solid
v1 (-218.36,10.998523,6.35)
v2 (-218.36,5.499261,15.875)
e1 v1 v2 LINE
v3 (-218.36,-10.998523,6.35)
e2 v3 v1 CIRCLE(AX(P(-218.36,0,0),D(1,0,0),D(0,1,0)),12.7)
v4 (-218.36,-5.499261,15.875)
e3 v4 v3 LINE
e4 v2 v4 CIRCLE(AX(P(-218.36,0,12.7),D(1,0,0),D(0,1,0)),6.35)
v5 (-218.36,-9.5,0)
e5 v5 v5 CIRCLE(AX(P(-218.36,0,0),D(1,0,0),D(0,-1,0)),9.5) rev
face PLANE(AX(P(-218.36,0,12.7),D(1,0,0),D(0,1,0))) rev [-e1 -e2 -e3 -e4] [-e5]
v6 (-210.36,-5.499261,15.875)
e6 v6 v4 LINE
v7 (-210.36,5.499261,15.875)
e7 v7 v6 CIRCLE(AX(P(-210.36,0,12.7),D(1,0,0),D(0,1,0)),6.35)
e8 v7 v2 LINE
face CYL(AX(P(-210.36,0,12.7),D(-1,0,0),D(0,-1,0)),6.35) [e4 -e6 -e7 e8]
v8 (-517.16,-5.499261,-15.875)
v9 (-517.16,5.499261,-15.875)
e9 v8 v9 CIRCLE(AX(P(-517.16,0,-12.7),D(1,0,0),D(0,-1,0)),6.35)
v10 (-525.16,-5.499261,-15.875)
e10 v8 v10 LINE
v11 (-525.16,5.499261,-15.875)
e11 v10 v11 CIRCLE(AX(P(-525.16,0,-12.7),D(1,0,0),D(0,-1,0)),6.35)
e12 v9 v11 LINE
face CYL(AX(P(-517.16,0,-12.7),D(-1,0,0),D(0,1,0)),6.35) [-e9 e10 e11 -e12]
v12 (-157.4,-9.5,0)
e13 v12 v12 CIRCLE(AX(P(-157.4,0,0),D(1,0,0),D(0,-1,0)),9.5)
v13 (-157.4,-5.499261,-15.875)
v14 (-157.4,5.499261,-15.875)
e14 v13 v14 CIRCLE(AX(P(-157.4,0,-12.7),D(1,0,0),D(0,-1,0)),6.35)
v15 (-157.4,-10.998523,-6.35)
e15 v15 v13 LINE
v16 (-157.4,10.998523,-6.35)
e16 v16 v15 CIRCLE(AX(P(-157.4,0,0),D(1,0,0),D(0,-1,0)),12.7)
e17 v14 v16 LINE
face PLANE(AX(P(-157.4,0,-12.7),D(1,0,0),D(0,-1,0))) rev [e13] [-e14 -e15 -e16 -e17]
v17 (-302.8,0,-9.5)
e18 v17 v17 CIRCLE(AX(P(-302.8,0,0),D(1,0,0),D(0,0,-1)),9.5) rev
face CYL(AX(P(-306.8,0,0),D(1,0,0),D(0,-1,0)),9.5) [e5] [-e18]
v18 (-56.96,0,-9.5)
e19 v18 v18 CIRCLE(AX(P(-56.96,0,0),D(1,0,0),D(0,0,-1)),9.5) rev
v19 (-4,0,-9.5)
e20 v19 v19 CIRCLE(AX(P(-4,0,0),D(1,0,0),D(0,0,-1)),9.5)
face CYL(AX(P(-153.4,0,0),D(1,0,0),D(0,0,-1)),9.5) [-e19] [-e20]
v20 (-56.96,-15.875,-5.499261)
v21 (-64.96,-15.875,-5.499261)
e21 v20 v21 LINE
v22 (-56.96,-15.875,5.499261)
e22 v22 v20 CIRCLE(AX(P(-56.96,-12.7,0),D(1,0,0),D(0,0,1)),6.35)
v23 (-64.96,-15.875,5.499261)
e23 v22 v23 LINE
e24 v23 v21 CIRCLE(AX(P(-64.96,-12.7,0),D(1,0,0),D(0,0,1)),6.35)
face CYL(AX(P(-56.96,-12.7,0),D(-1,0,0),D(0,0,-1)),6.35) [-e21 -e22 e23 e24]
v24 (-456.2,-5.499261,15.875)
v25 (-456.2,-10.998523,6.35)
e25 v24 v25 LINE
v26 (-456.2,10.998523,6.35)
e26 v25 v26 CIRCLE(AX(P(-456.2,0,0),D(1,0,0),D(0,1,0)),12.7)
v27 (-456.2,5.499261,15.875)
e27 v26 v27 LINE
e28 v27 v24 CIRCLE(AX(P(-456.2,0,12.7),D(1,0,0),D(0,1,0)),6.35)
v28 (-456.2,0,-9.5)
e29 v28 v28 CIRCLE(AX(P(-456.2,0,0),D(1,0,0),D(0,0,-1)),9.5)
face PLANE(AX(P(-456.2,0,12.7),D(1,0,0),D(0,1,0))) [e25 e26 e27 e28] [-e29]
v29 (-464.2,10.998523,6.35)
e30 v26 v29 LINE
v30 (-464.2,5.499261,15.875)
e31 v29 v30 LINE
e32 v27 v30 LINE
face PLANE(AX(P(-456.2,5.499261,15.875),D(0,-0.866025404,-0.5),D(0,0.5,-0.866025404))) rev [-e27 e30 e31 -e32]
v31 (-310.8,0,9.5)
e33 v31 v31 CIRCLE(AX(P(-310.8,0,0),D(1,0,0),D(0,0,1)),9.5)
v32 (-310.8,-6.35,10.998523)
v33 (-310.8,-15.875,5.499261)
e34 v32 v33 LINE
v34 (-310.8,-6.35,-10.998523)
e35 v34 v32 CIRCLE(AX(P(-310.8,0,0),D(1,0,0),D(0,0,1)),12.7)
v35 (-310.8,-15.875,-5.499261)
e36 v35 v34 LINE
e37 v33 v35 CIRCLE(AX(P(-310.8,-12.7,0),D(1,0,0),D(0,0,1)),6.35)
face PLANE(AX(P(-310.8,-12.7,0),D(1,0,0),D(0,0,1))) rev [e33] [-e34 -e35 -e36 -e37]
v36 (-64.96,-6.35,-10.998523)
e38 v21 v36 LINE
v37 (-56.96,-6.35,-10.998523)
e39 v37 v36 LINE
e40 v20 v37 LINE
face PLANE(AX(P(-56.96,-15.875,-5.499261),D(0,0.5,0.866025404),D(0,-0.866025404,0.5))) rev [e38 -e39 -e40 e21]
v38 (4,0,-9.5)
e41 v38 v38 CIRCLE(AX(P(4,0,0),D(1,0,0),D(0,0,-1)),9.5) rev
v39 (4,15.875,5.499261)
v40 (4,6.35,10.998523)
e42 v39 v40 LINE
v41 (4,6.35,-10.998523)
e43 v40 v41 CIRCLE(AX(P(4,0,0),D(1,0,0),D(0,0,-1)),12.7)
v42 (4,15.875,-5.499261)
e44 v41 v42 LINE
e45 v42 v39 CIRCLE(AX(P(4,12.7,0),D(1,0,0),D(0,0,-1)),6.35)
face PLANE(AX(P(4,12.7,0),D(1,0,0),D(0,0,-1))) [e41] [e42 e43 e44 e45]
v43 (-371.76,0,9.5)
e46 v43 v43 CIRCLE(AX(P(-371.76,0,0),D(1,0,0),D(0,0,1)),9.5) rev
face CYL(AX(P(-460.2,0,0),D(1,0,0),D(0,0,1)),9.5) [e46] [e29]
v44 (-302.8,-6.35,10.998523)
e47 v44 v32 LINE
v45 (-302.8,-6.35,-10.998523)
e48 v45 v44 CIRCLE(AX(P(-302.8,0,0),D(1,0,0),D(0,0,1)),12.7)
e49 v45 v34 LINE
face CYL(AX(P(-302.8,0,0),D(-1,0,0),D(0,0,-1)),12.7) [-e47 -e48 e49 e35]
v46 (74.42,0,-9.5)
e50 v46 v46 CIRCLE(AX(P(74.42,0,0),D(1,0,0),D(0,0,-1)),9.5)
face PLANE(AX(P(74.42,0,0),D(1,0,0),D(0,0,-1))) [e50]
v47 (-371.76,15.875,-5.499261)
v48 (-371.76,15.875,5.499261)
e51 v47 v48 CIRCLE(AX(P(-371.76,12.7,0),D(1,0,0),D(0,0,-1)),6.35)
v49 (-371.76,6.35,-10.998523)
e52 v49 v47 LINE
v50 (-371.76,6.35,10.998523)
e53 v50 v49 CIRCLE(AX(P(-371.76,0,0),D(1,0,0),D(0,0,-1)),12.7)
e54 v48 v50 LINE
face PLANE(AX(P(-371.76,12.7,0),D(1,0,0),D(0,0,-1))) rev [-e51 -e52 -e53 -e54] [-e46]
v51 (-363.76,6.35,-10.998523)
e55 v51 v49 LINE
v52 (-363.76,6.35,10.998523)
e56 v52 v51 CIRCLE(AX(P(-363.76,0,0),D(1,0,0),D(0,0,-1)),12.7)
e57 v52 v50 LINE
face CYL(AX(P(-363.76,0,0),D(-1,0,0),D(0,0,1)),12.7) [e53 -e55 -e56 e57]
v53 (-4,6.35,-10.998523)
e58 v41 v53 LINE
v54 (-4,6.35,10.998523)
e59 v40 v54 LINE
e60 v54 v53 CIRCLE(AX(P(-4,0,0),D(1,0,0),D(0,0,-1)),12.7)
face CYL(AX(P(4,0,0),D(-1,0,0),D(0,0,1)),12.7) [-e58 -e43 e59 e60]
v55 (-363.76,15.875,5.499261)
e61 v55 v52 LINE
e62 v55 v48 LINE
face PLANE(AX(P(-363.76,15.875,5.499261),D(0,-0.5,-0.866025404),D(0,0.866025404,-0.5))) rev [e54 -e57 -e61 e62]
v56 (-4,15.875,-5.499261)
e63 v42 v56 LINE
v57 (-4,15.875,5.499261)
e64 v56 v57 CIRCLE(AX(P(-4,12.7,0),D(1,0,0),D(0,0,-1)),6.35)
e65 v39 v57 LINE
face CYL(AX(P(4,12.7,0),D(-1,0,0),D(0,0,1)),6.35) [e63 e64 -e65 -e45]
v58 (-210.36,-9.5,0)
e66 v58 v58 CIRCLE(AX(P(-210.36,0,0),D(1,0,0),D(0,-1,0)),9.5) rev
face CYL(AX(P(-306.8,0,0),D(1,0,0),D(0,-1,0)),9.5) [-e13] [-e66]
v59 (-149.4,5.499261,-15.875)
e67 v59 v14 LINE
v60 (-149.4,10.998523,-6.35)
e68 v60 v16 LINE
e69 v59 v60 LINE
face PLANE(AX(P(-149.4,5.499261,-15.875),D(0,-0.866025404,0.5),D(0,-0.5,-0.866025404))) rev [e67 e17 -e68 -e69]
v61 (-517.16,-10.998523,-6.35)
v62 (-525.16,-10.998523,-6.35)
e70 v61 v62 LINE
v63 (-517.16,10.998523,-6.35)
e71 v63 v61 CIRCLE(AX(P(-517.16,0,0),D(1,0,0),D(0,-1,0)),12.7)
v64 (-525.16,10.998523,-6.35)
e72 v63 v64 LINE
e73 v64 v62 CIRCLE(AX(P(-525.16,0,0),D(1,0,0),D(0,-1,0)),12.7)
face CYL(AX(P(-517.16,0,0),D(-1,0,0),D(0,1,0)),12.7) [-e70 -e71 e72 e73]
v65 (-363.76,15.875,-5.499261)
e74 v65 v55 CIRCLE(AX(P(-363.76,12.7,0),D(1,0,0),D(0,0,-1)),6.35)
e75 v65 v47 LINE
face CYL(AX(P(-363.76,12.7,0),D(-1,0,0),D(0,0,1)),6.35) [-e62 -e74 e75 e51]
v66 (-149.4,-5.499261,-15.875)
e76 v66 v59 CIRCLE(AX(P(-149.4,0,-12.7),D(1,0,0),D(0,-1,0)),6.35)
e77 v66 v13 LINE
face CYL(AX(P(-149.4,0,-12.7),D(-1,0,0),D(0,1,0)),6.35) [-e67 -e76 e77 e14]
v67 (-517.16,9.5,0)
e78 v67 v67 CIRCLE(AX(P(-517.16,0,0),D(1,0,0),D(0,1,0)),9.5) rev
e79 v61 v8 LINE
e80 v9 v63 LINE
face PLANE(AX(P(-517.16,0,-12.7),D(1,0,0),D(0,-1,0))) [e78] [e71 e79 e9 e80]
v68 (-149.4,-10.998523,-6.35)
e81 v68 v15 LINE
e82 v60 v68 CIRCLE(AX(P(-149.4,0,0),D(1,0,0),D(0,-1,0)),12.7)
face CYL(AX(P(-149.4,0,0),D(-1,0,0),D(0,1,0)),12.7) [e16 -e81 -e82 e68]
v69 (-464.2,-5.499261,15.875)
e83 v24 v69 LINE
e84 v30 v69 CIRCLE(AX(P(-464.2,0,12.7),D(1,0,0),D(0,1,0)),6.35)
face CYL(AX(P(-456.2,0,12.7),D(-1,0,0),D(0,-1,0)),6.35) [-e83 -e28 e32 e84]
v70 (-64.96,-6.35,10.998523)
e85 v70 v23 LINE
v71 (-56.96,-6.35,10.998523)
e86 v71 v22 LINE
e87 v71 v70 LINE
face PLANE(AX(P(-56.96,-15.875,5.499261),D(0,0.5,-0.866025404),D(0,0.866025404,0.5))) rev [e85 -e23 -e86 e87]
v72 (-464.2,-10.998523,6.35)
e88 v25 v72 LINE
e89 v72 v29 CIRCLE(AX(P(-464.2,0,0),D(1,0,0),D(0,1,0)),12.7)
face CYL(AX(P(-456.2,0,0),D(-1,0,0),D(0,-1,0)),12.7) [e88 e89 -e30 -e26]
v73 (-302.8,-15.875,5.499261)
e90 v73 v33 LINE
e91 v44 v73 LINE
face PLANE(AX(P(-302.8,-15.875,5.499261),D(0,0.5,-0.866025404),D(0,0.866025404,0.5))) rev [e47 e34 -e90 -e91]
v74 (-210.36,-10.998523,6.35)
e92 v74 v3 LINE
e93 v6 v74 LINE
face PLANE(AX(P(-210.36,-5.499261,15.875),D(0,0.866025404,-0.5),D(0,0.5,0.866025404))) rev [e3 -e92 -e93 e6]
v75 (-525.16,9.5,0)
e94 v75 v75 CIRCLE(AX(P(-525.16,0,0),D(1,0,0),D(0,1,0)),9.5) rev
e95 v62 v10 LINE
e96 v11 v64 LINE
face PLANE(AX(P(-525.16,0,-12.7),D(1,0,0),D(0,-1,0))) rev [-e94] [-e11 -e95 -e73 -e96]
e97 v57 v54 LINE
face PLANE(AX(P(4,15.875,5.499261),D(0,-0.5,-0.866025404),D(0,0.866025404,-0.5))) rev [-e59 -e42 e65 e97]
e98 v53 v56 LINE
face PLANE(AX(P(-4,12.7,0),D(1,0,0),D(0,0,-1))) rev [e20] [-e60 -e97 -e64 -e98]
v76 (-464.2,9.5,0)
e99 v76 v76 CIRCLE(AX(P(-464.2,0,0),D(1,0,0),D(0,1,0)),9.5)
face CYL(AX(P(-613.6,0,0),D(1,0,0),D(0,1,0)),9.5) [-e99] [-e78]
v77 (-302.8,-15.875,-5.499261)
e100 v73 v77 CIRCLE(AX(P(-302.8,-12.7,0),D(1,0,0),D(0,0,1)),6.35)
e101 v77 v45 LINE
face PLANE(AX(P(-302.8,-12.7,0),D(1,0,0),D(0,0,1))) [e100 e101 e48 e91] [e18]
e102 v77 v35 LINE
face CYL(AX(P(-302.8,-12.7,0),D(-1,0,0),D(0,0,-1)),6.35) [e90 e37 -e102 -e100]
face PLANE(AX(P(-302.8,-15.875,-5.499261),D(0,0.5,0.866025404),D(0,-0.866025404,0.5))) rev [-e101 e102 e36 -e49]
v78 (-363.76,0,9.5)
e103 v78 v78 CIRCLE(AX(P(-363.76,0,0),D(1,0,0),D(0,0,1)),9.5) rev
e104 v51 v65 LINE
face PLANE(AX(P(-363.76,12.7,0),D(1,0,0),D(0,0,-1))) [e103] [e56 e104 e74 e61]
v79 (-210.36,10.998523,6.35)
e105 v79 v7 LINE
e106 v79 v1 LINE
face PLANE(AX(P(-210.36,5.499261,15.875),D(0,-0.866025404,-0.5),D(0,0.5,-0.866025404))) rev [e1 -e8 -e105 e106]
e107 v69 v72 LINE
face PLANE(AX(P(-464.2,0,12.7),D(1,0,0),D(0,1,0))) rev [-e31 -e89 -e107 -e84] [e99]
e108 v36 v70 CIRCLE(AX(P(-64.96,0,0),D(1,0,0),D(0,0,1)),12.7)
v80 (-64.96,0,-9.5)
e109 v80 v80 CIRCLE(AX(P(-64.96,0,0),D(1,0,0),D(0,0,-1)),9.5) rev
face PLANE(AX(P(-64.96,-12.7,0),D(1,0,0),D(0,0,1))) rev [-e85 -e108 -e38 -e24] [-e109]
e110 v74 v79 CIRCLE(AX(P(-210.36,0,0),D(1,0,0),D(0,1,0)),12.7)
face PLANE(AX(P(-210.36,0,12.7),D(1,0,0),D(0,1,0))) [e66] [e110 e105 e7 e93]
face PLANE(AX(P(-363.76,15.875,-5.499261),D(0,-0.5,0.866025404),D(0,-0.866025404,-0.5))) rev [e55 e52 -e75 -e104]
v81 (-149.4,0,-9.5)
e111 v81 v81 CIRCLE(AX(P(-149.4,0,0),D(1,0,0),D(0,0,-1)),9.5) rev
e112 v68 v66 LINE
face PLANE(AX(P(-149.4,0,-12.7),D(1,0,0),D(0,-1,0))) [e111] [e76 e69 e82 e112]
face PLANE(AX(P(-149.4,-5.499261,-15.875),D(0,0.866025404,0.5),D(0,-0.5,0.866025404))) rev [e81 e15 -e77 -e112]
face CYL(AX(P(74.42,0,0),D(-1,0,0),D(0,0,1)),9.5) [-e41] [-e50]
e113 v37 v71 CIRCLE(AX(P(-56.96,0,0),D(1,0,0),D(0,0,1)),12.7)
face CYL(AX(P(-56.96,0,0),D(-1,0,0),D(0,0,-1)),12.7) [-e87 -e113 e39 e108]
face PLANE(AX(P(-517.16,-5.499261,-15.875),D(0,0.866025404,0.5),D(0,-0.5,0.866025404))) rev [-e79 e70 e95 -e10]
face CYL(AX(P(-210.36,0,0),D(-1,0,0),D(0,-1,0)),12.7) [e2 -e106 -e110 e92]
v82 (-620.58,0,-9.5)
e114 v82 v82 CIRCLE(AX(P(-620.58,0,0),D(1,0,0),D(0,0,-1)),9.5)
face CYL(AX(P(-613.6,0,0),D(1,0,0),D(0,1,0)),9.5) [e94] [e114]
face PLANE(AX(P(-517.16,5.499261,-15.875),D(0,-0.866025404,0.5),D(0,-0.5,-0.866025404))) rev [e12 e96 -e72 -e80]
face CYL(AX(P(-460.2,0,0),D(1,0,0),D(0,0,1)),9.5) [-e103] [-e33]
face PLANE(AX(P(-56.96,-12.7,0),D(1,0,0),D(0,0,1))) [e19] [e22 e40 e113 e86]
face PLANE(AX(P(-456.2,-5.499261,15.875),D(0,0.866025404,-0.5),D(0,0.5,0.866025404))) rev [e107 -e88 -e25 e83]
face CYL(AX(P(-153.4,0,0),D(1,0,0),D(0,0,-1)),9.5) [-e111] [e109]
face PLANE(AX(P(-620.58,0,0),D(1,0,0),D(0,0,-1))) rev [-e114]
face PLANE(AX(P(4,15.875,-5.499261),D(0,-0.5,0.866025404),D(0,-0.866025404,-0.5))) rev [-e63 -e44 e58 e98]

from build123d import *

# Parameters (mm, degrees)
BOSS_EXTRUDE1_DEPTH         = 4
BODY_MOVE_COPY2_ANGLE       = 180
SKETCH2_R                   = 9.5
BOSS_EXTRUDE2_DEPTH         = 153.4
BODY_MOVE_COPY3_START       = -613.6
BODY_MOVE_COPY3_OUTLINE_R   = 9.5
BODY_MOVE_COPY3_DEPTH       = 157.4
BODY_MOVE_COPY3_START_2     = -525.16
BODY_MOVE_COPY3_2_OUTLINE_R = 9.5
BODY_MOVE_COPY3_2_DEPTH     = 8
BODY_MOVE_COPY3_START_3     = -464.2
BODY_MOVE_COPY3_3_OUTLINE_R = 9.5
BODY_MOVE_COPY3_3_DEPTH     = 8
BODY_MOVE_COPY3_START_4     = -460.2
BODY_MOVE_COPY3_4_OUTLINE_R = 9.5
BODY_MOVE_COPY3_4_DEPTH     = 157.4
BODY_MOVE_COPY3_START_5     = -371.76
BODY_MOVE_COPY3_5_OUTLINE_R = 9.5
BODY_MOVE_COPY3_5_DEPTH     = 8
BODY_MOVE_COPY3_START_6     = -310.8
BODY_MOVE_COPY3_6_OUTLINE_R = 9.5
BODY_MOVE_COPY3_6_DEPTH     = 8
BODY_MOVE_COPY3_START_7     = -306.8
BODY_MOVE_COPY3_7_OUTLINE_R = 9.5
BODY_MOVE_COPY3_7_DEPTH     = 157.4
BODY_MOVE_COPY3_START_8     = -218.36
BODY_MOVE_COPY3_8_OUTLINE_R = 9.5
BODY_MOVE_COPY3_8_DEPTH     = 8
BODY_MOVE_COPY3_START_9     = -157.4
BODY_MOVE_COPY3_9_OUTLINE_R = 9.5
BODY_MOVE_COPY3_9_DEPTH     = 8
BODY_MOVE_COPY4_ANGLE       = 90
BODY_MOVE_COPY5_ANGLE       = 180
BODY_MOVE_COPY6_ANGLE       = 90
BOSS_EXTRUDE3_START         = 74.42
SKETCH2_2_R                 = 9.5
BOSS_EXTRUDE3_DEPTH         = 74.42
BOSS_EXTRUDE4_START         = -620.58
SKETCH2_3_R                 = 9.5
BOSS_EXTRUDE4_DEPTH         = 6.98


# Read off the part's stored shape, not the designer's step: Body-Move/Copy3
with BuildPart() as part:
    # Sketch1 → Boss-Extrude1 (new, symmetric)
    with BuildSketch(Plane(origin=(0, 0, 0), x_dir=(0, 0, -1), z_dir=(1, 0, 0))):
        with BuildLine():
            Line((5.499261314, 15.875), (10.998522628, 6.35))
            ThreePointArc((10.998522628, 6.35), (0, -12.7), (-10.998522628, 6.35))
            Line((-10.998522628, 6.35), (-5.499261314, 15.875))
            ThreePointArc((-5.499261314, 15.875), (0, 19.05), (5.499261314, 15.875))
        make_face()
    extrude(amount=BOSS_EXTRUDE1_DEPTH, both=True)


with BuildPart() as body_2:
    # Body-Move/Copy1: copy of part
    add(part.part.moved(Location((-60.96, 0, 0))))


with BuildPart() as body_2_1:
    # Body-Move/Copy2: moved
    add(body_2.part.rotate(Axis((0, 0, 0), (1, 0, 0)), BODY_MOVE_COPY2_ANGLE))


with BuildPart() as part_1:
    add(part.part)

    add(body_2_1.part)  # Boss-Extrude2 merges body 2
    # Sketch2 → Boss-Extrude2 (add)
    with BuildSketch(Plane(origin=(0, 0, 0), x_dir=(0, 0, -1), z_dir=(1, 0, 0))):
        Circle(SKETCH2_R)
    extrude(amount=-BOSS_EXTRUDE2_DEPTH)

    # Sketch2<2> → Boss-Extrude3 (add)
    with BuildSketch(Plane(origin=(0, 0, 0), x_dir=(0, 0, -1), z_dir=(1, 0, 0)).offset(BOSS_EXTRUDE3_START)):
        with Locations(Location((0, 0, 0), (0, 0, 180))):
            Circle(SKETCH2_2_R)
    extrude(amount=-BOSS_EXTRUDE3_DEPTH)


with BuildPart() as body_2_2:
    # Body-Move/Copy3 outline → Body-Move/Copy3 (new body)
    with BuildSketch(Plane.YZ.offset(BODY_MOVE_COPY3_START)):
        Circle(BODY_MOVE_COPY3_OUTLINE_R)
    extrude(amount=BODY_MOVE_COPY3_DEPTH)

    # Body-Move_Copy3 2 outline → Body-Move_Copy3 2 (add)
    with BuildSketch(Plane.YZ.offset(BODY_MOVE_COPY3_START_2)):
        with BuildLine():
            ThreePointArc((6.35, -10.998522628), (12.7, 0), (6.35, 10.998522628))
            ThreePointArc((6.35, 10.998522628), (0, 12.7), (-6.35, 10.998522628))
            Line((-6.35, 10.998522628), (-15.875, 5.499261314))
            ThreePointArc((-15.875, 5.499261314), (-19.05, 0), (-15.875, -5.499261314))
            Line((-15.875, -5.499261314), (-6.35, -10.998522628))
            ThreePointArc((-6.35, -10.998522628), (0, -12.7), (6.35, -10.998522628))
        make_face()
        Circle(BODY_MOVE_COPY3_2_OUTLINE_R, mode=Mode.SUBTRACT)
    extrude(amount=BODY_MOVE_COPY3_2_DEPTH)

    # Body-Move_Copy3 3 outline → Body-Move_Copy3 3 (add)
    with BuildSketch(Plane.YZ.offset(BODY_MOVE_COPY3_START_3)):
        with BuildLine():
            ThreePointArc((15.875, -5.499261314), (19.05, 0), (15.875, 5.499261314))
            Line((15.875, 5.499261314), (6.35, 10.998522628))
            ThreePointArc((6.35, 10.998522628), (-12.7, 0), (6.35, -10.998522628))
            Line((6.35, -10.998522628), (15.875, -5.499261314))
        make_face()
        Circle(BODY_MOVE_COPY3_3_OUTLINE_R, mode=Mode.SUBTRACT)
    extrude(amount=BODY_MOVE_COPY3_3_DEPTH)


with BuildPart() as body_3:
    # Body-Move_Copy3 4 outline → Body-Move_Copy3 4 (new body)
    with BuildSketch(Plane.YZ.offset(BODY_MOVE_COPY3_START_4)):
        Circle(BODY_MOVE_COPY3_4_OUTLINE_R)
    extrude(amount=BODY_MOVE_COPY3_4_DEPTH)

    # Body-Move_Copy3 5 outline → Body-Move_Copy3 5 (add)
    with BuildSketch(Plane.YZ.offset(BODY_MOVE_COPY3_START_5)):
        with BuildLine():
            ThreePointArc((6.35, -10.998522628), (12.7, 0), (6.35, 10.998522628))
            ThreePointArc((6.35, 10.998522628), (0, 12.7), (-6.35, 10.998522628))
            Line((-6.35, 10.998522628), (-15.875, 5.499261314))
            ThreePointArc((-15.875, 5.499261314), (-19.05, 0), (-15.875, -5.499261314))
            Line((-15.875, -5.499261314), (-6.35, -10.998522628))
            ThreePointArc((-6.35, -10.998522628), (0, -12.7), (6.35, -10.998522628))
        make_face()
        Circle(BODY_MOVE_COPY3_5_OUTLINE_R, mode=Mode.SUBTRACT)
    extrude(amount=BODY_MOVE_COPY3_5_DEPTH)

    # Body-Move_Copy3 6 outline → Body-Move_Copy3 6 (add)
    with BuildSketch(Plane.YZ.offset(BODY_MOVE_COPY3_START_6)):
        with BuildLine():
            ThreePointArc((15.875, -5.499261314), (19.05, 0), (15.875, 5.499261314))
            Line((15.875, 5.499261314), (6.35, 10.998522628))
            ThreePointArc((6.35, 10.998522628), (-12.7, 0), (6.35, -10.998522628))
            Line((6.35, -10.998522628), (15.875, -5.499261314))
        make_face()
        Circle(BODY_MOVE_COPY3_6_OUTLINE_R, mode=Mode.SUBTRACT)
    extrude(amount=BODY_MOVE_COPY3_6_DEPTH)


with BuildPart() as body_4:
    # Body-Move_Copy3 7 outline → Body-Move_Copy3 7 (new body)
    with BuildSketch(Plane.YZ.offset(BODY_MOVE_COPY3_START_7)):
        Circle(BODY_MOVE_COPY3_7_OUTLINE_R)
    extrude(amount=BODY_MOVE_COPY3_7_DEPTH)

    # Body-Move_Copy3 8 outline → Body-Move_Copy3 8 (add)
    with BuildSketch(Plane.YZ.offset(BODY_MOVE_COPY3_START_8)):
        with BuildLine():
            ThreePointArc((6.35, -10.998522628), (12.7, 0), (6.35, 10.998522628))
            ThreePointArc((6.35, 10.998522628), (0, 12.7), (-6.35, 10.998522628))
            Line((-6.35, 10.998522628), (-15.875, 5.499261314))
            ThreePointArc((-15.875, 5.499261314), (-19.05, 0), (-15.875, -5.499261314))
            Line((-15.875, -5.499261314), (-6.35, -10.998522628))
            ThreePointArc((-6.35, -10.998522628), (0, -12.7), (6.35, -10.998522628))
        make_face()
        Circle(BODY_MOVE_COPY3_8_OUTLINE_R, mode=Mode.SUBTRACT)
    extrude(amount=BODY_MOVE_COPY3_8_DEPTH)

    # Body-Move_Copy3 9 outline → Body-Move_Copy3 9 (add)
    with BuildSketch(Plane.YZ.offset(BODY_MOVE_COPY3_START_9)):
        with BuildLine():
            ThreePointArc((15.875, -5.499261314), (19.05, 0), (15.875, 5.499261314))
            Line((15.875, 5.499261314), (6.35, 10.998522628))
            ThreePointArc((6.35, 10.998522628), (-12.7, 0), (6.35, -10.998522628))
            Line((6.35, -10.998522628), (15.875, -5.499261314))
        make_face()
        Circle(BODY_MOVE_COPY3_9_OUTLINE_R, mode=Mode.SUBTRACT)
    extrude(amount=BODY_MOVE_COPY3_9_DEPTH)


with BuildPart() as body_4_1:
    # Body-Move/Copy4: moved
    add(body_4.part.rotate(Axis((0, 0, 0), (-1, 0, 0)), BODY_MOVE_COPY4_ANGLE))


with BuildPart() as body_3_1:
    # Body-Move/Copy5: moved
    add(body_3.part.rotate(Axis((0, 0, 0), (1, 0, 0)), BODY_MOVE_COPY5_ANGLE))


with BuildPart() as body_2_2_1:
    # Body-Move/Copy6: moved
    add(body_2_2.part.rotate(Axis((0, 0, 0), (1, 0, 0)), BODY_MOVE_COPY6_ANGLE))

    # Combine1: union part, body 4, body 3
    add(part_1.part)
    add(body_4_1.part)
    add(body_3_1.part)

    # Sketch2<3> → Boss-Extrude4 (add)
    with BuildSketch(Plane(origin=(0, 0, 0), x_dir=(0, 0, -1), z_dir=(1, 0, 0)).offset(BOSS_EXTRUDE4_START)):
        with Locations(Location((0, 0, 0), (0, 0, 90))):
            Circle(SKETCH2_3_R)
    extrude(amount=BOSS_EXTRUDE4_DEPTH)


solid = body_2_2_1.part
